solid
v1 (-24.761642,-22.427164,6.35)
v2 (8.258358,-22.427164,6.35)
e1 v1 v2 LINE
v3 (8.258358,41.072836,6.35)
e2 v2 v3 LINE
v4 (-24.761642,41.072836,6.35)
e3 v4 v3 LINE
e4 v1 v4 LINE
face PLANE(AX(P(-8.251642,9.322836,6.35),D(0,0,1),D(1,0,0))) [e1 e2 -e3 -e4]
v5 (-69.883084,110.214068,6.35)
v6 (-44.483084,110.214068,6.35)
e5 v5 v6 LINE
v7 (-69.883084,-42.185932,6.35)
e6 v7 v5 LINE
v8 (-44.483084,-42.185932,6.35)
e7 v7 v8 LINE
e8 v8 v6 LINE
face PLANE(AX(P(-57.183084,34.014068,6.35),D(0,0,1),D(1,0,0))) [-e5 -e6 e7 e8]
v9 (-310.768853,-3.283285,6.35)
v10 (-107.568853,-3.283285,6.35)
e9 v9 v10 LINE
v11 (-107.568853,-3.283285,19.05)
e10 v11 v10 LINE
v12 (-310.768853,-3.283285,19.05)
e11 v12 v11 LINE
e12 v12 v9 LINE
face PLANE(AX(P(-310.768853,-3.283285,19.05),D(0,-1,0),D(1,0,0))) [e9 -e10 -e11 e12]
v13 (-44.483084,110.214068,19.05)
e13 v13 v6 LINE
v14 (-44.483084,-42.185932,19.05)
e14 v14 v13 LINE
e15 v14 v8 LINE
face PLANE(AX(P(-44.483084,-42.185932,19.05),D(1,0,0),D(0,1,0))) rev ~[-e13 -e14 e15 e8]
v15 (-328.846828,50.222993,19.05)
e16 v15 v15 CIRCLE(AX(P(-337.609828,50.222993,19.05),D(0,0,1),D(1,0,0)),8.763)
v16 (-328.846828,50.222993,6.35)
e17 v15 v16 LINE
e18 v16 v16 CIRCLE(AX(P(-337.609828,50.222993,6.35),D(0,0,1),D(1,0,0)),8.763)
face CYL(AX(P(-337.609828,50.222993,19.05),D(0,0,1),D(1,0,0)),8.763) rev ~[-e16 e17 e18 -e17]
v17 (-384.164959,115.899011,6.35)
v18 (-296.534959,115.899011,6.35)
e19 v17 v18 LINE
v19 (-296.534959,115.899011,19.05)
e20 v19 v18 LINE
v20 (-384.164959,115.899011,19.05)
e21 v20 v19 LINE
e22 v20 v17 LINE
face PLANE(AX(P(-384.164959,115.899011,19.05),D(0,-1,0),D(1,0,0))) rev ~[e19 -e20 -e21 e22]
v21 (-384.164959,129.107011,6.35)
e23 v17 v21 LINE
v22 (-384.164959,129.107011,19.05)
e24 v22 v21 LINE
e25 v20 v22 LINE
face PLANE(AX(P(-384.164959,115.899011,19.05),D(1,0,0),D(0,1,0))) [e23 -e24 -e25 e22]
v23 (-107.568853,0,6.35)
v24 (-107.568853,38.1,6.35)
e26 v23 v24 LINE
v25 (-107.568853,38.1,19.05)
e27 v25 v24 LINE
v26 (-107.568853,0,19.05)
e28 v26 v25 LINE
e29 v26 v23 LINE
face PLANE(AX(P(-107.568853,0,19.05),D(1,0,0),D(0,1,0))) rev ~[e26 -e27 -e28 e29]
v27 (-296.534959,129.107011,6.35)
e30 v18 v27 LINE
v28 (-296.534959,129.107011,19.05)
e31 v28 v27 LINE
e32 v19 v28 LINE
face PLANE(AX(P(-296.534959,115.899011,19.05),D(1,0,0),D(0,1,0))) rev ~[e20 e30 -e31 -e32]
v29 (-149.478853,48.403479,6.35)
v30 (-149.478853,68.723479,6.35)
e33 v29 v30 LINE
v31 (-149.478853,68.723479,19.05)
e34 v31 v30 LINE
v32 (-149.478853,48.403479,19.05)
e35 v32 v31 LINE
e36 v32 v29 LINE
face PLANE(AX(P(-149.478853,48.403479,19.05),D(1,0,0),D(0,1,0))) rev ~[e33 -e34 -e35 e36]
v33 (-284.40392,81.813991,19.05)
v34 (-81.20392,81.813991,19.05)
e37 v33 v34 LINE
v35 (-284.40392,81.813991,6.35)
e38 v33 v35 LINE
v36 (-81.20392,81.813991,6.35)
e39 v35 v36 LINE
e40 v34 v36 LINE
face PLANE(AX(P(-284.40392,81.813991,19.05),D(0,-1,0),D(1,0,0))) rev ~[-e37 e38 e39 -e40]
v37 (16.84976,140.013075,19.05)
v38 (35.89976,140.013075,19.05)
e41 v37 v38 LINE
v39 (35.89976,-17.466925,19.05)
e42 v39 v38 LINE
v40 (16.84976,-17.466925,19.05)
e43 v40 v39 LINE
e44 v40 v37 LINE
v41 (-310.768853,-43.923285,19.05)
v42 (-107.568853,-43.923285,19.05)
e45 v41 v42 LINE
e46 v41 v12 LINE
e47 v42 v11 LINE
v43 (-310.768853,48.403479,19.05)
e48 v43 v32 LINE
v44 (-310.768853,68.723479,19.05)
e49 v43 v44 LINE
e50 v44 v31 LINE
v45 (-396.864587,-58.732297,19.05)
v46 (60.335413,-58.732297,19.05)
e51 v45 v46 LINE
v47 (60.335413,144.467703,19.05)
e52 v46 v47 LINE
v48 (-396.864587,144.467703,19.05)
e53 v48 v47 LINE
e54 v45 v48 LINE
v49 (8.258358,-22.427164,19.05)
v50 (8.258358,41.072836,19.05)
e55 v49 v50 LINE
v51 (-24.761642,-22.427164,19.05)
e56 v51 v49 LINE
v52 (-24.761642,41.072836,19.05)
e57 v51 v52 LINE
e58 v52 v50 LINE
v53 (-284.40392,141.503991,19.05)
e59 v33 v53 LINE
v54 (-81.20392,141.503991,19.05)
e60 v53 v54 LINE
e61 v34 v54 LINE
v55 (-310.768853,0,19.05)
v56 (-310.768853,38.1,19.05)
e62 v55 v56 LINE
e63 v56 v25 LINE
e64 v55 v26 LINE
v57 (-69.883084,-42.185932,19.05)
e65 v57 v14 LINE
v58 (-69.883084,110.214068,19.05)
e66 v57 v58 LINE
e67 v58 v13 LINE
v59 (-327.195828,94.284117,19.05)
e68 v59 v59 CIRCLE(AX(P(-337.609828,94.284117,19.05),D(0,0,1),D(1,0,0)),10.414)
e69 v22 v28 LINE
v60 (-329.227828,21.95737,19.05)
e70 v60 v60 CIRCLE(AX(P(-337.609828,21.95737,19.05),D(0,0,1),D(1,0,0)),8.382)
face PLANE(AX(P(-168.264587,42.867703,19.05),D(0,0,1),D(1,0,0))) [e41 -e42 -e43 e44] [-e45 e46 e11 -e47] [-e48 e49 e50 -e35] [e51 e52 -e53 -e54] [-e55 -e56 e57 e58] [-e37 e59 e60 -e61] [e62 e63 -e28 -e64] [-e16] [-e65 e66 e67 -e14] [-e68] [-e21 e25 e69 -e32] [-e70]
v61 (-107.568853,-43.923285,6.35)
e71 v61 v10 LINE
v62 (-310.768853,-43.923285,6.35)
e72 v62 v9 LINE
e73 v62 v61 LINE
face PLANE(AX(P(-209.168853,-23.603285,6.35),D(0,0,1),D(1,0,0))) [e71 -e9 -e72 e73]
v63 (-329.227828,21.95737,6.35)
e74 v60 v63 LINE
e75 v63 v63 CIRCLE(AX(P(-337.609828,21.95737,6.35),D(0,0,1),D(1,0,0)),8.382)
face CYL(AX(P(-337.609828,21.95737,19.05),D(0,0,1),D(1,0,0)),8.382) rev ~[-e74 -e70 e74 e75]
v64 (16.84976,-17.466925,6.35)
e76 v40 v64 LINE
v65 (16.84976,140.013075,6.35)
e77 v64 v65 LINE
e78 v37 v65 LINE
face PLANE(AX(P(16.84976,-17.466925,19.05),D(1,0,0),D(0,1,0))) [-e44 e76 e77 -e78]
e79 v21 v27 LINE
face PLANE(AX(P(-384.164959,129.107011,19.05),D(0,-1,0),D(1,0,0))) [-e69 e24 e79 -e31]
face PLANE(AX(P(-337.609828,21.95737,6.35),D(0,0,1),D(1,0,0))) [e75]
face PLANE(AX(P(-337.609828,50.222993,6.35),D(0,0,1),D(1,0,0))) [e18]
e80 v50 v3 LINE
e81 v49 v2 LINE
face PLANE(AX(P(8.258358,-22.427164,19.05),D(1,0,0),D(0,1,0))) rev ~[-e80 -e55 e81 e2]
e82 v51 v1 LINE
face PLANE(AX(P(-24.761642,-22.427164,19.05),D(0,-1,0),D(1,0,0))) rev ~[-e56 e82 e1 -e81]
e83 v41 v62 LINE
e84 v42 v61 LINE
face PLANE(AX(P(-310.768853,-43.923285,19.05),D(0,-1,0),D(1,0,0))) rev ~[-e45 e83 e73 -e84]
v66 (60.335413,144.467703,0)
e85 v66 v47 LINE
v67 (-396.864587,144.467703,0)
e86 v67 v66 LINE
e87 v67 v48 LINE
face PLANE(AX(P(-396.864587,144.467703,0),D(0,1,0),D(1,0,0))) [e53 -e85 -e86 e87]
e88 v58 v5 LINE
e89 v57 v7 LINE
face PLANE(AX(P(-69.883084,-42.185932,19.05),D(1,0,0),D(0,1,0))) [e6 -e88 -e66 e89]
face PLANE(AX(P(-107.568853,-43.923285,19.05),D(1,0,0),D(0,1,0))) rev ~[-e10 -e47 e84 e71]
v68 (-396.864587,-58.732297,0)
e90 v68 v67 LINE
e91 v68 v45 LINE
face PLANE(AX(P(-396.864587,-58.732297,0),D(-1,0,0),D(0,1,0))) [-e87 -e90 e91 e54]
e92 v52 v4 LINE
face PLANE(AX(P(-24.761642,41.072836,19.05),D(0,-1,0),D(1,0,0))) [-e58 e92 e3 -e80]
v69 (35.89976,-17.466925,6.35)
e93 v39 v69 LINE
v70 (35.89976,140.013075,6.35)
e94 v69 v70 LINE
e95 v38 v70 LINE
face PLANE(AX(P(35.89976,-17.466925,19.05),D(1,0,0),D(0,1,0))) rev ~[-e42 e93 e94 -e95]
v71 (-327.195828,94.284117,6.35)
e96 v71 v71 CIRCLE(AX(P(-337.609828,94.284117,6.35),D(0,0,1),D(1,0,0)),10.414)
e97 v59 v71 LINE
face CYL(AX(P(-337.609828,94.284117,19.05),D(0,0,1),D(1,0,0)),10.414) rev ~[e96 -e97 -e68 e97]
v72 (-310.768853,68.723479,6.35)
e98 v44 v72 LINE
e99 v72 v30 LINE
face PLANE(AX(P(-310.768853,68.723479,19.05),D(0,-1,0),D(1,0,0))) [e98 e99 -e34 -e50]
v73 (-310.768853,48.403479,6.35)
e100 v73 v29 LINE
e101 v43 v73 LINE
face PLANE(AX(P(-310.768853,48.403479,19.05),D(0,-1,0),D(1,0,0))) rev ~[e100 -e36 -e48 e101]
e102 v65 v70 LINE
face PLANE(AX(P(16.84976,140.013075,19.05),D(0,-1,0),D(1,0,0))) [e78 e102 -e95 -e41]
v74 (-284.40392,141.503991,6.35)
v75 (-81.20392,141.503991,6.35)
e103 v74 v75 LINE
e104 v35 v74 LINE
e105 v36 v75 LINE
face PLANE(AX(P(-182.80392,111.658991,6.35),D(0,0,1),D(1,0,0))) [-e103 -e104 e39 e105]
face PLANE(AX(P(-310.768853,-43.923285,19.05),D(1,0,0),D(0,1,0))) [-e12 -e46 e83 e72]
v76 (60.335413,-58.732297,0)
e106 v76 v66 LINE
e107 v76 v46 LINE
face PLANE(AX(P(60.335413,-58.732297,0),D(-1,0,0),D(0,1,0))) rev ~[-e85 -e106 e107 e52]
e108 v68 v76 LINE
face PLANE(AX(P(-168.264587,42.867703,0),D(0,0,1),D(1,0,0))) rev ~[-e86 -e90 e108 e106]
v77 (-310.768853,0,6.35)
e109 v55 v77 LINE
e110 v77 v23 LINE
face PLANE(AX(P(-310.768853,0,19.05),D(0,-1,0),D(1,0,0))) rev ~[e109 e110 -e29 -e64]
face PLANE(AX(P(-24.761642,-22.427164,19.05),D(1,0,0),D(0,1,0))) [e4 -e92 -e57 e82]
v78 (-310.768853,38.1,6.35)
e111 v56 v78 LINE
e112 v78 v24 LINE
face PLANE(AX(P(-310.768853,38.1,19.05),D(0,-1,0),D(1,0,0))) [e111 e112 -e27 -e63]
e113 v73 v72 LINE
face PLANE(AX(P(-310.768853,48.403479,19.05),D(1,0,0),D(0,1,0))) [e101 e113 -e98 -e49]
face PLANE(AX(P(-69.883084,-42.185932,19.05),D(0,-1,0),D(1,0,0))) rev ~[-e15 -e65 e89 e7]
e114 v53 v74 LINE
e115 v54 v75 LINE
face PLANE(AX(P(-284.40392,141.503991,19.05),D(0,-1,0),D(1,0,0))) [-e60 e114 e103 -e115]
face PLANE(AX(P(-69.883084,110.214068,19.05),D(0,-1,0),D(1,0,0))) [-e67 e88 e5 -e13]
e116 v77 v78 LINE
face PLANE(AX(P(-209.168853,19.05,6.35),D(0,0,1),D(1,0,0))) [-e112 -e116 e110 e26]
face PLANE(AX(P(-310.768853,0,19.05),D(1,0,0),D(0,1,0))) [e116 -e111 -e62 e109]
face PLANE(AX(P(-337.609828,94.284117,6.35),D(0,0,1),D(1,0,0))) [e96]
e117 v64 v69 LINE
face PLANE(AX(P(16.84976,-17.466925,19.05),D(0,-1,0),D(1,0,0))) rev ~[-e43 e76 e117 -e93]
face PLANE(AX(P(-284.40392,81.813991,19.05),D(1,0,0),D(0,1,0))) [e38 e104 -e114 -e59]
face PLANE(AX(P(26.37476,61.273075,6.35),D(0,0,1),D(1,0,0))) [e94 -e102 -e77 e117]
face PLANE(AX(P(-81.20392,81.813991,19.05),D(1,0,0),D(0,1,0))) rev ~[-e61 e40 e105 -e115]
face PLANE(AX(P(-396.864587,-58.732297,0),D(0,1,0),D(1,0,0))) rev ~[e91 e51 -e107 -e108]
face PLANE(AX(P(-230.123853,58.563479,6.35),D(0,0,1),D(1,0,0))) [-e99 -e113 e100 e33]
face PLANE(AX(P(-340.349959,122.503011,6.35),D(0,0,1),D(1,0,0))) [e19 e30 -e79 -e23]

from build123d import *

# Parameters (mm, degrees)
F0_W      = 457.2
F0_H      = 203.2
F1_DEPTH  = 19.05
F2_W      = 203.2
F2_H      = 59.69
F3_R      = 10.414
F3_R_2    = 8.763
F3_R_3    = 8.382
F5_DEPTH  = 19.05
F6_W      = 87.63
F6_H      = 13.208
F11_DEPTH = 12.7
F8_W      = 161.29
F8_H      = 20.32
F8_W_2    = 203.2
F8_H_2    = 38.1
F8_H_3    = 40.64
F12_DEPTH = 12.7
F9_W      = 25.4
F9_H      = 152.4
F10_W     = 33.02
F10_H     = 63.5
F13_DEPTH = 12.7
F7_W      = 19.05
F7_H      = 157.48
F14_DEPTH = 12.7
F15_DEPTH = 12.7
F16_DEPTH = 12.7


# Not quite as in the source:
# - the program builds the solid bodies; features that only make, move or delete a surface that nothing else refers to are left out


with BuildPart() as f1:
    # F0 (on Top) → F1 (new body)
    with BuildSketch(Plane.XY):
        with Locations((-168.2645873785, 42.8677027285)):
            Rectangle(F0_W, F0_H)
    extrude(amount=F1_DEPTH)

    # F2 (on face) + F3 (on face) → F5 (join)
    with BuildSketch(Plane.XY.offset(19.05)):
        with Locations((-182.8039201736, 111.6589910698)):
            Rectangle(F2_W, F2_H)
    with BuildSketch(Plane.XY.offset(19.05)):
        with Locations((-337.6098275185, 94.2841172218)):
            Circle(F3_R)
        with Locations((-337.6098275185, 50.222992897)):
            Circle(F3_R_2)
        with Locations((-337.6098275185, 21.9573695213)):
            Circle(F3_R_3)
    extrude(amount=-F5_DEPTH)

    # F6 (on face) → F11 (cut)
    with BuildSketch(Plane.XY.offset(19.05)):
        with Locations((-340.3499591923, 122.5030114927)):
            Rectangle(F6_W, F6_H)
    extrude(amount=-F11_DEPTH, mode=Mode.SUBTRACT)

    # F8 (on face) → F12 (cut)
    with BuildSketch(Plane.XY.offset(19.05)):
        with Locations((-230.1238527489, 58.5634791589)):
            Rectangle(F8_W, F8_H)
        with Locations((-209.1688527489, 19.05)):
            Rectangle(F8_W_2, F8_H_2)
        with Locations((-209.1688527489, -23.6032848585)):
            Rectangle(F8_W_2, F8_H_3)
    extrude(amount=-F12_DEPTH, mode=Mode.SUBTRACT)

    # F9 (on face) + F10 (on face) → F13 (cut)
    with BuildSketch(Plane.XY.offset(19.05)):
        with Locations((-57.1830842316, 34.0140676022)):
            Rectangle(F9_W, F9_H)
    with BuildSketch(Plane.XY.offset(19.05)):
        with Locations((-8.2516423559, 9.3228359818)):
            Rectangle(F10_W, F10_H)
    extrude(amount=-F13_DEPTH, mode=Mode.SUBTRACT)

    # F7 (on face) → F14 (cut)
    with BuildSketch(Plane.XY.offset(19.05)):
        with Locations((26.3747599661, 61.2730749154)):
            Rectangle(F7_W, F7_H)
    extrude(amount=-F14_DEPTH, mode=Mode.SUBTRACT)

    # F2 (on face) → F15 (cut)
    with BuildSketch(Plane.XY.offset(19.05)):
        with Locations((-182.8039201736, 111.6589910698)):
            Rectangle(F2_W, F2_H)
    extrude(amount=-F15_DEPTH, mode=Mode.SUBTRACT)

    # F3 (on face) → F16 (cut)
    with BuildSketch(Plane.XY.offset(19.05)):
        with Locations((-337.6098275185, 94.2841172218)):
            Circle(F3_R)
        with Locations((-337.6098275185, 50.222992897)):
            Circle(F3_R_2)
        with Locations((-337.6098275185, 21.9573695213)):
            Circle(F3_R_3)
    extrude(amount=-F16_DEPTH, mode=Mode.SUBTRACT)


solid = f1.part
